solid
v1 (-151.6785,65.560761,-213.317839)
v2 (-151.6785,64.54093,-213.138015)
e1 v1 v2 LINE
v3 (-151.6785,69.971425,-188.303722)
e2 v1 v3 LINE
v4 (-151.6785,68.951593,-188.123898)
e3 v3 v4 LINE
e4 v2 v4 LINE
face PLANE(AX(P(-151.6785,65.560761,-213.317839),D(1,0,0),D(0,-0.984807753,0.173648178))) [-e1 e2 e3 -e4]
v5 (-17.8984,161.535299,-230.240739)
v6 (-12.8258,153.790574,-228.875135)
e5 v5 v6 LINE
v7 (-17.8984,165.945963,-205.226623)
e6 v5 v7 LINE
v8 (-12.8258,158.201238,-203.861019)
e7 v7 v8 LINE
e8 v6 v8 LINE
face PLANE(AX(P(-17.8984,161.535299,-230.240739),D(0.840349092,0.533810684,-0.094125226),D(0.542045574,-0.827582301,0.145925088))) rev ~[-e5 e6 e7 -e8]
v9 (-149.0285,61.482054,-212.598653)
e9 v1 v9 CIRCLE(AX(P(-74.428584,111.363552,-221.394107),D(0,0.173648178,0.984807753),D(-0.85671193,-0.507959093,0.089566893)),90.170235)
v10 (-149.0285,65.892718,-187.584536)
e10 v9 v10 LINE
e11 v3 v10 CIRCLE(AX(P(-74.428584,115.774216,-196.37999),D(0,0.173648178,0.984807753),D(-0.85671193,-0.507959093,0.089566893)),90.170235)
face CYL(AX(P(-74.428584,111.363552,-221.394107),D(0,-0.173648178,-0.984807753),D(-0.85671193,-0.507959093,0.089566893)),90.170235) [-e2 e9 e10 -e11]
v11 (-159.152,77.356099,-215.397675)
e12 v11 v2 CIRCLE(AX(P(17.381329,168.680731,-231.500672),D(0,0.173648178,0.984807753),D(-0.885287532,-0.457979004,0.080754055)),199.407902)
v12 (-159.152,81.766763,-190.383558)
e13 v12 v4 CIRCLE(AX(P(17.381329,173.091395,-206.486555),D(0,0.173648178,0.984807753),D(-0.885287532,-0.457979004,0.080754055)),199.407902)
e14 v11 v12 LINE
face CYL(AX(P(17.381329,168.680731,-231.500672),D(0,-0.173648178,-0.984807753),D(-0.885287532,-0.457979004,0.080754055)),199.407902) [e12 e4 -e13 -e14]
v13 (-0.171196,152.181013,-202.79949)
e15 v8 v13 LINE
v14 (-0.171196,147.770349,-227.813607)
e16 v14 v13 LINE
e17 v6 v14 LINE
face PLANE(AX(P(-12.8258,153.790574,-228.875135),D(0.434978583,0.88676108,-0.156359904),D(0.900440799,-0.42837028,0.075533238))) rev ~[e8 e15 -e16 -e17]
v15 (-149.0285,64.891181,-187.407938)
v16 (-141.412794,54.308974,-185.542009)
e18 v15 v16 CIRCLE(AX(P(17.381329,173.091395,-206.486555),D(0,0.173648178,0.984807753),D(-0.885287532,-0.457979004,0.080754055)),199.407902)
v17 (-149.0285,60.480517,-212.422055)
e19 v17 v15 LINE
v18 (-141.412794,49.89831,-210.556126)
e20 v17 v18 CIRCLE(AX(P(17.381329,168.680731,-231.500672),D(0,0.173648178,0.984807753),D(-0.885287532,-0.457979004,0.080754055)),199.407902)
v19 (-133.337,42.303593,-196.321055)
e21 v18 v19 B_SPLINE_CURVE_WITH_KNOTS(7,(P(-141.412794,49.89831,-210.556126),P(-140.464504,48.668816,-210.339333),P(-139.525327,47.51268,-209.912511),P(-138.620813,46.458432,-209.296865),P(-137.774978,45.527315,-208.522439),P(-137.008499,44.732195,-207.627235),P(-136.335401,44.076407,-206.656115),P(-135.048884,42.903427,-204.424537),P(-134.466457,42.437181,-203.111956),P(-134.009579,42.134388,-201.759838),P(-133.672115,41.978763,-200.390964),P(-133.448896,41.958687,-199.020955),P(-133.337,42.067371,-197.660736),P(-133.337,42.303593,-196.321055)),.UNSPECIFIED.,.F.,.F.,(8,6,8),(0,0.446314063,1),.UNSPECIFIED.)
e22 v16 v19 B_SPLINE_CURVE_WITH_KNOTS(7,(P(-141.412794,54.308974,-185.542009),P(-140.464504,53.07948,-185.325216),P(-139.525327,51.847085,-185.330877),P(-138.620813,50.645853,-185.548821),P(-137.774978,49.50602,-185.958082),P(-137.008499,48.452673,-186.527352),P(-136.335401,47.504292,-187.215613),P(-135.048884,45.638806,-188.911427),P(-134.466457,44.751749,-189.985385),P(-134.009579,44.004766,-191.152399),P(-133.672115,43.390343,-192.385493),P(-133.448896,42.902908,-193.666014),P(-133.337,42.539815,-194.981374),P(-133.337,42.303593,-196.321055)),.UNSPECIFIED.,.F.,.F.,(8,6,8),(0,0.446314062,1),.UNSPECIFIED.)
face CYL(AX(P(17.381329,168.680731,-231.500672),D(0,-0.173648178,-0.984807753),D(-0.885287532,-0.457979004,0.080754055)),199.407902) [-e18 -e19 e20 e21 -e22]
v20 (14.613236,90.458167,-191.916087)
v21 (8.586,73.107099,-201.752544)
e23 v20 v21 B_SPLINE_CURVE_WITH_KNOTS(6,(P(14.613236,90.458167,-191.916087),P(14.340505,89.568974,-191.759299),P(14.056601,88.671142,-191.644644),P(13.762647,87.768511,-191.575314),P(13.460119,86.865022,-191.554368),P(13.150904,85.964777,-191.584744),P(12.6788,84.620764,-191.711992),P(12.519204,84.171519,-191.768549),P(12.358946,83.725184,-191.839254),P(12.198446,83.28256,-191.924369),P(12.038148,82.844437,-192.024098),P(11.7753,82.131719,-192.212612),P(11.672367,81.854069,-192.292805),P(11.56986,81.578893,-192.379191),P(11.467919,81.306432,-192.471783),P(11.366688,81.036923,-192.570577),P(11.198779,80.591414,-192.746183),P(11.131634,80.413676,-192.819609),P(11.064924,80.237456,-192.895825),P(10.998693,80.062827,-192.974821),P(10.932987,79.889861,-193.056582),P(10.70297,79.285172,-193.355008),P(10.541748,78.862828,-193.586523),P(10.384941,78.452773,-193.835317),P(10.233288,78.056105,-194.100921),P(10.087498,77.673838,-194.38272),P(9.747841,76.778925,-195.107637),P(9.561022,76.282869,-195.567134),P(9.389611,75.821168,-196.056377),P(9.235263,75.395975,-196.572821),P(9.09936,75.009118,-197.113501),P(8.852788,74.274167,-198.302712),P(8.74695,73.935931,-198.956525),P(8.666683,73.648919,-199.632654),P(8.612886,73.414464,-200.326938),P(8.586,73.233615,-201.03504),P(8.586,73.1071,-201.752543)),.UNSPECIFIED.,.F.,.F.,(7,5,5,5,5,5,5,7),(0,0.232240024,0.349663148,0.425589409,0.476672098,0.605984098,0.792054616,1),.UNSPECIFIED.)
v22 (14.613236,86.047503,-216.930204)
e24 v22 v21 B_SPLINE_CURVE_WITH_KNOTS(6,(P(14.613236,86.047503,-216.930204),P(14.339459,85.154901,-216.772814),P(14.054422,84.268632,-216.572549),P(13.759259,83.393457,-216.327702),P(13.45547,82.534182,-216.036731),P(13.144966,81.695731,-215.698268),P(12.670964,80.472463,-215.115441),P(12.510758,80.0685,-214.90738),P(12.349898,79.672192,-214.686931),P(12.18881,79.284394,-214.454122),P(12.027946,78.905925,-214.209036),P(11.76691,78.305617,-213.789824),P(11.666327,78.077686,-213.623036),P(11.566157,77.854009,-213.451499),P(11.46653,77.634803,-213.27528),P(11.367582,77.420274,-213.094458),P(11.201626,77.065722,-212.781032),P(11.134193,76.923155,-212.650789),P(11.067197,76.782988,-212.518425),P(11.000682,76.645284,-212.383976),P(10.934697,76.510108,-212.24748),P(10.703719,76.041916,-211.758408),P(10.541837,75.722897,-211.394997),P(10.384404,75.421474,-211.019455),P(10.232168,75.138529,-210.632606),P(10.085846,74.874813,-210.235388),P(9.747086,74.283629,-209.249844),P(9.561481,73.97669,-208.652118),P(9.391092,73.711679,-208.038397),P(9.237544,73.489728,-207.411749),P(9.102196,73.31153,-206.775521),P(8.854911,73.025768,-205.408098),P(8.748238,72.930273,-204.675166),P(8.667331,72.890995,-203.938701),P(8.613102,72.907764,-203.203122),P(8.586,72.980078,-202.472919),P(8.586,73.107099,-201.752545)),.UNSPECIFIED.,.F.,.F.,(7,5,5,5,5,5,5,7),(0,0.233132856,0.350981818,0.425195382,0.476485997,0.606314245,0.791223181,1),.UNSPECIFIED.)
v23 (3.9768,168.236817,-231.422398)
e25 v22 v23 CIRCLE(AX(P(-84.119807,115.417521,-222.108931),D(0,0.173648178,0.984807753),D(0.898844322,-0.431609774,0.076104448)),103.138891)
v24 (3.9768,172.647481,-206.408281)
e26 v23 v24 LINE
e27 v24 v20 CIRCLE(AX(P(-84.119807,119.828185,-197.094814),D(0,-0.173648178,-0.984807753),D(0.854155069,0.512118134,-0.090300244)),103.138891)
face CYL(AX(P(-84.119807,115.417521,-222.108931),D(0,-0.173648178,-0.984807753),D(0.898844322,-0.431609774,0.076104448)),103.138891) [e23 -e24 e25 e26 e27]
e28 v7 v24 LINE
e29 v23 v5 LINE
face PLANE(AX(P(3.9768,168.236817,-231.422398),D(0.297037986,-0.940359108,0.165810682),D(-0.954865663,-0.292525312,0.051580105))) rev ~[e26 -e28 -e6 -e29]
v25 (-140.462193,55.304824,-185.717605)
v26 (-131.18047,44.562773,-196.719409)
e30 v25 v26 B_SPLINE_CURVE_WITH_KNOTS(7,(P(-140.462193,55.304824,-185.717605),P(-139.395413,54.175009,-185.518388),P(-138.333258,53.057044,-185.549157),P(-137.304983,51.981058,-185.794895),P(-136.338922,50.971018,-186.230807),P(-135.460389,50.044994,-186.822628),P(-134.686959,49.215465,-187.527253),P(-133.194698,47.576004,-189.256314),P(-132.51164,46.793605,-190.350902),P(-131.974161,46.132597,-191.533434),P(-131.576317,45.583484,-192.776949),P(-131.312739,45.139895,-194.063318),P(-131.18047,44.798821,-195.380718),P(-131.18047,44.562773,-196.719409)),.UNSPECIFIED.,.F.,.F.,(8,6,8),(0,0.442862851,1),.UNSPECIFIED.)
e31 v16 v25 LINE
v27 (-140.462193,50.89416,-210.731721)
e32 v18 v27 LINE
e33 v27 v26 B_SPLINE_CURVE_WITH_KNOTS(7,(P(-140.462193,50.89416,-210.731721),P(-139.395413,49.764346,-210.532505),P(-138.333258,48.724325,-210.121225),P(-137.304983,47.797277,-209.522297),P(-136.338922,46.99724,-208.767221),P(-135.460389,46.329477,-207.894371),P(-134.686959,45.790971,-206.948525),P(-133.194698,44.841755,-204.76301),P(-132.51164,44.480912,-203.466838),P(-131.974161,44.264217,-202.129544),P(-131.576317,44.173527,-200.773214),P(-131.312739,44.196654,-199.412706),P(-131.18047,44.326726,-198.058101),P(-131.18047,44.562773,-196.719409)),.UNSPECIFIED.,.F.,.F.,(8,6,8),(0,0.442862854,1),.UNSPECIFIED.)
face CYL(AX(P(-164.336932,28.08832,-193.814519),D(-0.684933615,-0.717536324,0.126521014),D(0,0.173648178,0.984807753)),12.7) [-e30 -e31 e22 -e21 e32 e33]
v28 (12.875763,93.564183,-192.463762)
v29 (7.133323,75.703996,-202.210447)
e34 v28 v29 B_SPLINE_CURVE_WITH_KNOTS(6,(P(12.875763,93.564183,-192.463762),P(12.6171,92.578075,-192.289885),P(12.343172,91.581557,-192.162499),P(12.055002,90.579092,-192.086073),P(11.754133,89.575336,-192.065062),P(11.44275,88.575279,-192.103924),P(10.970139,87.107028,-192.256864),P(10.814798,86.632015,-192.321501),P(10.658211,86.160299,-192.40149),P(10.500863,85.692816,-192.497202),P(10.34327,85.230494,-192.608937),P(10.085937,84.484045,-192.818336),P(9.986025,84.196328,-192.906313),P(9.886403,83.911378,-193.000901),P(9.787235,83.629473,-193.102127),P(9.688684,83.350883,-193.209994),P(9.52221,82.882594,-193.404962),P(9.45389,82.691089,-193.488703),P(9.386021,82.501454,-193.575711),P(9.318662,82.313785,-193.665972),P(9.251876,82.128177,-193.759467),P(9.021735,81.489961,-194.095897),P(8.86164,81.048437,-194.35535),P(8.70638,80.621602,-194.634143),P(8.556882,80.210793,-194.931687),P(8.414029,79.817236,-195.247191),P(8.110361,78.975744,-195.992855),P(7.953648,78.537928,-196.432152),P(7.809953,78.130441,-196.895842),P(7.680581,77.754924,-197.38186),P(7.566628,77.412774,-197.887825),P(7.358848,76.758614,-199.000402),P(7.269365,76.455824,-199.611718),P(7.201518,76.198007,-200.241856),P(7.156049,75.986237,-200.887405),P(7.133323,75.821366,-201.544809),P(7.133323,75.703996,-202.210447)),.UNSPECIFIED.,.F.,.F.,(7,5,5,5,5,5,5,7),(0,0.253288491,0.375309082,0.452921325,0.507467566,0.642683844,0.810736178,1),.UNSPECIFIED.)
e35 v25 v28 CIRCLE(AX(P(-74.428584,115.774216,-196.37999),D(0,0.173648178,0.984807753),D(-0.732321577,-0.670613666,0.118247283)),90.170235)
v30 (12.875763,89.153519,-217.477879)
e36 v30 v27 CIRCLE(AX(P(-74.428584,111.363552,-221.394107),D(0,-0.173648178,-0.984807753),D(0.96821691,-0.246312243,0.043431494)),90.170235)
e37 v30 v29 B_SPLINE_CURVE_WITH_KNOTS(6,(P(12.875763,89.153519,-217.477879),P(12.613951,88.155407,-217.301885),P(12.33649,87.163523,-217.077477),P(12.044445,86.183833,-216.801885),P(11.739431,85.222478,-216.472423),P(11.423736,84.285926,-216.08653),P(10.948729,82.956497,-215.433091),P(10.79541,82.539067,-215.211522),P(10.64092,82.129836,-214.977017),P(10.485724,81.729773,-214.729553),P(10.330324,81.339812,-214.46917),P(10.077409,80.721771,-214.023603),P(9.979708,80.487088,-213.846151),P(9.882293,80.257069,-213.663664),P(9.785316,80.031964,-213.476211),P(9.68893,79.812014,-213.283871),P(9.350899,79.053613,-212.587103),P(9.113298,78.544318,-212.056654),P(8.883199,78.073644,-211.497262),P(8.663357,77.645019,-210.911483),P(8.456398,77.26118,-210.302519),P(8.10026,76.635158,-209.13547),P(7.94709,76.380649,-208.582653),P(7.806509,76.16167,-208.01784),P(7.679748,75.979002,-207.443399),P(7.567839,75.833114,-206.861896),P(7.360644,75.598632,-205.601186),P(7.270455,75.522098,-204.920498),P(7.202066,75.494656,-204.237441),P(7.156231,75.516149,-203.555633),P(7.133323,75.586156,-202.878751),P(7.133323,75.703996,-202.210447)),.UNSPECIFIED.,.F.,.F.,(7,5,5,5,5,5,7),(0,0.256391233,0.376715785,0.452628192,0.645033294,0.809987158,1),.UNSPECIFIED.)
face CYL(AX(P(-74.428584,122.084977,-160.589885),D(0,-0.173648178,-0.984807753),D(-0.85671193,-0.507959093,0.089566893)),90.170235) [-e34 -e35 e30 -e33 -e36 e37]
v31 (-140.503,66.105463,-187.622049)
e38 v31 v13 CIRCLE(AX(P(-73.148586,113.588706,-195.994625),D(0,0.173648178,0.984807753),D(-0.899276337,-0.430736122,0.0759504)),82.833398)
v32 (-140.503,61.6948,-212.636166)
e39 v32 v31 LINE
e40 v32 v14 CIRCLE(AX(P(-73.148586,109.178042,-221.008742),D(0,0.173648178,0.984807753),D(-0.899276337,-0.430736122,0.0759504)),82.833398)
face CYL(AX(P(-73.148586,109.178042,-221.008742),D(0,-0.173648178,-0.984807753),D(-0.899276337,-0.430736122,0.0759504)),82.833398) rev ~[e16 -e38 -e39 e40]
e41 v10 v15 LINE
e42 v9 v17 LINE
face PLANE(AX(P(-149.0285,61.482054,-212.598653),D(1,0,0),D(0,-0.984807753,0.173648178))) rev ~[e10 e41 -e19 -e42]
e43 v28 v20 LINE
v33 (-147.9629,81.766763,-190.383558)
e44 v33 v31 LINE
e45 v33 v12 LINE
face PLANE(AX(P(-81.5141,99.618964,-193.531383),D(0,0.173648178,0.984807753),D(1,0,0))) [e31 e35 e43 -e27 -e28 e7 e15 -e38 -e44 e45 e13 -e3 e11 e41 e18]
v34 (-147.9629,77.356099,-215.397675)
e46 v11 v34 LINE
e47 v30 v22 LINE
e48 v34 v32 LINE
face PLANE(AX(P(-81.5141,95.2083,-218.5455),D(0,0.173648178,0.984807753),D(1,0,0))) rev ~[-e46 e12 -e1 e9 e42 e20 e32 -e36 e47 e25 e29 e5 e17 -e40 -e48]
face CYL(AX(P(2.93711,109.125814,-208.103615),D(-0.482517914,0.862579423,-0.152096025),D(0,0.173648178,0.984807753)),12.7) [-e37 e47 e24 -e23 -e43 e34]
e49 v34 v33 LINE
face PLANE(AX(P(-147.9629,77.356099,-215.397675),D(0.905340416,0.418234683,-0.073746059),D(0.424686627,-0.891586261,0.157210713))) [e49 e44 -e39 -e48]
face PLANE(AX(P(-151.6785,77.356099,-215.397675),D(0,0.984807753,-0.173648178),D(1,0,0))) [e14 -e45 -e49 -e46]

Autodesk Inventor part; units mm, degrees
ref_plane "YZ Plane" through (0, 0, 0) normal (1, 0, 0) x (0, 1, 0)
ref_plane "XZ Plane" through (0, 0, 0) normal (0, 1, 0) x (-1, 0, 0)
ref_plane "Work Plane1" through (27.2016, 137.7902, -207.6153) normal (0, 0, 1) x (1, 0, 0)
ref_plane "Work Plane2" through (-81.5141, 115.844, -101.5145) normal (0, 0, 1) x (1, 0, 0)
sketch "Sketch2" plane through (27.2016, 137.7902, -207.6153) normal (0, 0, 1) x (1, 0, 0)
  line L0 (-50.9279, -141.1381) -> (10.2073, -141.1381)
  point P0 (-27.2016, -137.7902)
ref_plane "Work Plane4" through (-23.7263, -2.2452, -201.3618) normal (0, 0.1736482, 0.9848078) x (1, 0, 0)
ref_plane "Work Plane3" through (-23.7263, -3.3479, -207.6153) normal (0, 0.1736482, 0.9848078) x (1, 0, 0)
sketch "Sketch1" plane through (-81.5141, 95.2083, -218.5455) normal (0, 0.1736482, 0.9848078) x (1, 0, 0)
  line L0 (120.3524, 26.6103) -> (110.8538, 39.0511) projected
  line L1 (109.9403, 39.2699) -> (118.8077, 27.6558) projected
  line L2 (117.4827, 25.3957) -> (118.8077, 27.6558) projected
  line L3 (108.6153, 37.0098) -> (109.9403, 39.2699) projected
  line L4 (-70.1644, -17.8234) -> (-70.1644, -42.3865) projected
  line L5 (-67.5144, -23.0328) -> (-67.5144, -49.6797) projected
  line L6 (-7.2549, -88.8185) -> (-7.2549, -90.7022)
  line L7 (88.6474, -22.0445) -> (90.1001, -24.6815)
  arc A0 (90.1001, -24.6815) -> (85.4909, 74.1551) centre (-2.6058, 20.521) ccw
  line L8 (68.6883, 59.486) -> (92.8567, 47.8109)
  ellipse E0 centre (117.3159, 24.5297) end of major axis (77.6327, 47.7943) minor radius 6.9177 (109.5288, 36.791) -> (89.1504, 46.193) ccw projected
  ellipse E1 centre (118.6409, 26.7898) end of major axis (80.226, 49.3108) minor radius 6.6966 (109.9403, 39.2699) -> (91.8991, 47.566) ccw projected
  line L9 (120.3524, 26.6103) -> (110.8538, 39.0511) projected
  line L10 (120.3524, 26.6103) -> (110.8538, 39.0511) projected
  line L11 (-70.1644, -47.9895) -> (-70.1644, -41.1809) projected
  line L12 (-78.1686, -54.9211) -> (-78.1686, -34.8) projected
  line L13 (-78.1686, -34.8) -> (-78.1686, -33.261) projected
  ellipse E2 centre (-68.1686, -34.8) end of major axis (-78.1686, -34.8) minor radius 8.1116 (-75.6686, -29.4347) -> (-78.1686, -34.8) ccw projected
  line L14 (-78.1686, -54.9211) -> (-78.1686, -34.8) projected
  line L15 (-77.6379, -18.1276) -> (-66.4488, -18.1276)
  line L16 (-66.4488, -18.1276) -> (-58.9889, -34.0305)
  arc A1 (-77.6379, -18.1276) -> (-51.8229, -55.9602) centre (98.8915, 74.6035) ccw
  line L17 (-51.8229, -55.9602) -> (-49.6664, -53.6662)
  ellipse E3 centre (43.7773, 28.2672) end of major axis (9.3333, 77.3077) minor radius 54.627 (86.8491, 61.886) -> (73.2137, 75.1203) ccw projected
  ellipse E4 centre (87.3016, 57.9812) end of major axis (48.0133, 78.9413) minor radius 0.2829 (58.2062, 73.2871) -> (75.8706, 63.7724) ccw projected
  ellipse E5 centre (86.0543, 55.6432) end of major axis (46.766, 76.6033) minor radius 0.2829 (56.9589, 70.9491) -> (74.6233, 61.4344) ccw projected
  ellipse E6 centre (-82.1686, -42.8548) end of major axis (-78.1686, -42.8548) minor radius 0.6946 (-78.1686, -42.8548) -> (-82.1686, -42.1602) ccw projected
  line L18 (85.4909, 74.1551) -> (63.6157, 67.3502)
  arc A2 (-66.1246, -22.0445) -> (76.0856, 61.886) centre (8.3655, 14.1852) ccw
  arc A3 (-70.1644, -30.1049) -> (79.8851, 69.6106) centre (7.0855, 16.4044) ccw
  line L19 (63.6157, 67.3502) -> (68.6883, 59.486)
  point P0 (81.5141, -131.7119)
  point P1 (-70.1644, -31.1405)
  point P2 (97.5203, 45.2683)
  point P3 (-67.5144, -35.2635)
  point P4 (96.3482, 45.7746)
  point P5 (98.1827, 42.4146)
  point P6 (110.3672, 38.7108)
  point P7 (-70.1644, -18.1276)
  point P8 (81.3429, 53.3729)
  point P9 (-67.5144, -34.2466)
extrude "Extrusion1" add sketch "Sketch1" along normal blind 25.4 contours E0 A3 E3 L18 A0 | A0 L7 A3 E0 | A3 L4 L15 L16 A2 L8 | L8 L19 L18 E3 A3 | L17 A1 L5 A3 | L4 A1 L15
fillet "Fillet1" radius 12.7 4 edges at (7.8596, 76.6109, -189.4744) (7.8596, 72.2002, -214.4886) (-132.2588, 41.2279, -209.0273) (-132.2588, 45.6386, -184.0132)
properties part number "thigh_strap_03"
